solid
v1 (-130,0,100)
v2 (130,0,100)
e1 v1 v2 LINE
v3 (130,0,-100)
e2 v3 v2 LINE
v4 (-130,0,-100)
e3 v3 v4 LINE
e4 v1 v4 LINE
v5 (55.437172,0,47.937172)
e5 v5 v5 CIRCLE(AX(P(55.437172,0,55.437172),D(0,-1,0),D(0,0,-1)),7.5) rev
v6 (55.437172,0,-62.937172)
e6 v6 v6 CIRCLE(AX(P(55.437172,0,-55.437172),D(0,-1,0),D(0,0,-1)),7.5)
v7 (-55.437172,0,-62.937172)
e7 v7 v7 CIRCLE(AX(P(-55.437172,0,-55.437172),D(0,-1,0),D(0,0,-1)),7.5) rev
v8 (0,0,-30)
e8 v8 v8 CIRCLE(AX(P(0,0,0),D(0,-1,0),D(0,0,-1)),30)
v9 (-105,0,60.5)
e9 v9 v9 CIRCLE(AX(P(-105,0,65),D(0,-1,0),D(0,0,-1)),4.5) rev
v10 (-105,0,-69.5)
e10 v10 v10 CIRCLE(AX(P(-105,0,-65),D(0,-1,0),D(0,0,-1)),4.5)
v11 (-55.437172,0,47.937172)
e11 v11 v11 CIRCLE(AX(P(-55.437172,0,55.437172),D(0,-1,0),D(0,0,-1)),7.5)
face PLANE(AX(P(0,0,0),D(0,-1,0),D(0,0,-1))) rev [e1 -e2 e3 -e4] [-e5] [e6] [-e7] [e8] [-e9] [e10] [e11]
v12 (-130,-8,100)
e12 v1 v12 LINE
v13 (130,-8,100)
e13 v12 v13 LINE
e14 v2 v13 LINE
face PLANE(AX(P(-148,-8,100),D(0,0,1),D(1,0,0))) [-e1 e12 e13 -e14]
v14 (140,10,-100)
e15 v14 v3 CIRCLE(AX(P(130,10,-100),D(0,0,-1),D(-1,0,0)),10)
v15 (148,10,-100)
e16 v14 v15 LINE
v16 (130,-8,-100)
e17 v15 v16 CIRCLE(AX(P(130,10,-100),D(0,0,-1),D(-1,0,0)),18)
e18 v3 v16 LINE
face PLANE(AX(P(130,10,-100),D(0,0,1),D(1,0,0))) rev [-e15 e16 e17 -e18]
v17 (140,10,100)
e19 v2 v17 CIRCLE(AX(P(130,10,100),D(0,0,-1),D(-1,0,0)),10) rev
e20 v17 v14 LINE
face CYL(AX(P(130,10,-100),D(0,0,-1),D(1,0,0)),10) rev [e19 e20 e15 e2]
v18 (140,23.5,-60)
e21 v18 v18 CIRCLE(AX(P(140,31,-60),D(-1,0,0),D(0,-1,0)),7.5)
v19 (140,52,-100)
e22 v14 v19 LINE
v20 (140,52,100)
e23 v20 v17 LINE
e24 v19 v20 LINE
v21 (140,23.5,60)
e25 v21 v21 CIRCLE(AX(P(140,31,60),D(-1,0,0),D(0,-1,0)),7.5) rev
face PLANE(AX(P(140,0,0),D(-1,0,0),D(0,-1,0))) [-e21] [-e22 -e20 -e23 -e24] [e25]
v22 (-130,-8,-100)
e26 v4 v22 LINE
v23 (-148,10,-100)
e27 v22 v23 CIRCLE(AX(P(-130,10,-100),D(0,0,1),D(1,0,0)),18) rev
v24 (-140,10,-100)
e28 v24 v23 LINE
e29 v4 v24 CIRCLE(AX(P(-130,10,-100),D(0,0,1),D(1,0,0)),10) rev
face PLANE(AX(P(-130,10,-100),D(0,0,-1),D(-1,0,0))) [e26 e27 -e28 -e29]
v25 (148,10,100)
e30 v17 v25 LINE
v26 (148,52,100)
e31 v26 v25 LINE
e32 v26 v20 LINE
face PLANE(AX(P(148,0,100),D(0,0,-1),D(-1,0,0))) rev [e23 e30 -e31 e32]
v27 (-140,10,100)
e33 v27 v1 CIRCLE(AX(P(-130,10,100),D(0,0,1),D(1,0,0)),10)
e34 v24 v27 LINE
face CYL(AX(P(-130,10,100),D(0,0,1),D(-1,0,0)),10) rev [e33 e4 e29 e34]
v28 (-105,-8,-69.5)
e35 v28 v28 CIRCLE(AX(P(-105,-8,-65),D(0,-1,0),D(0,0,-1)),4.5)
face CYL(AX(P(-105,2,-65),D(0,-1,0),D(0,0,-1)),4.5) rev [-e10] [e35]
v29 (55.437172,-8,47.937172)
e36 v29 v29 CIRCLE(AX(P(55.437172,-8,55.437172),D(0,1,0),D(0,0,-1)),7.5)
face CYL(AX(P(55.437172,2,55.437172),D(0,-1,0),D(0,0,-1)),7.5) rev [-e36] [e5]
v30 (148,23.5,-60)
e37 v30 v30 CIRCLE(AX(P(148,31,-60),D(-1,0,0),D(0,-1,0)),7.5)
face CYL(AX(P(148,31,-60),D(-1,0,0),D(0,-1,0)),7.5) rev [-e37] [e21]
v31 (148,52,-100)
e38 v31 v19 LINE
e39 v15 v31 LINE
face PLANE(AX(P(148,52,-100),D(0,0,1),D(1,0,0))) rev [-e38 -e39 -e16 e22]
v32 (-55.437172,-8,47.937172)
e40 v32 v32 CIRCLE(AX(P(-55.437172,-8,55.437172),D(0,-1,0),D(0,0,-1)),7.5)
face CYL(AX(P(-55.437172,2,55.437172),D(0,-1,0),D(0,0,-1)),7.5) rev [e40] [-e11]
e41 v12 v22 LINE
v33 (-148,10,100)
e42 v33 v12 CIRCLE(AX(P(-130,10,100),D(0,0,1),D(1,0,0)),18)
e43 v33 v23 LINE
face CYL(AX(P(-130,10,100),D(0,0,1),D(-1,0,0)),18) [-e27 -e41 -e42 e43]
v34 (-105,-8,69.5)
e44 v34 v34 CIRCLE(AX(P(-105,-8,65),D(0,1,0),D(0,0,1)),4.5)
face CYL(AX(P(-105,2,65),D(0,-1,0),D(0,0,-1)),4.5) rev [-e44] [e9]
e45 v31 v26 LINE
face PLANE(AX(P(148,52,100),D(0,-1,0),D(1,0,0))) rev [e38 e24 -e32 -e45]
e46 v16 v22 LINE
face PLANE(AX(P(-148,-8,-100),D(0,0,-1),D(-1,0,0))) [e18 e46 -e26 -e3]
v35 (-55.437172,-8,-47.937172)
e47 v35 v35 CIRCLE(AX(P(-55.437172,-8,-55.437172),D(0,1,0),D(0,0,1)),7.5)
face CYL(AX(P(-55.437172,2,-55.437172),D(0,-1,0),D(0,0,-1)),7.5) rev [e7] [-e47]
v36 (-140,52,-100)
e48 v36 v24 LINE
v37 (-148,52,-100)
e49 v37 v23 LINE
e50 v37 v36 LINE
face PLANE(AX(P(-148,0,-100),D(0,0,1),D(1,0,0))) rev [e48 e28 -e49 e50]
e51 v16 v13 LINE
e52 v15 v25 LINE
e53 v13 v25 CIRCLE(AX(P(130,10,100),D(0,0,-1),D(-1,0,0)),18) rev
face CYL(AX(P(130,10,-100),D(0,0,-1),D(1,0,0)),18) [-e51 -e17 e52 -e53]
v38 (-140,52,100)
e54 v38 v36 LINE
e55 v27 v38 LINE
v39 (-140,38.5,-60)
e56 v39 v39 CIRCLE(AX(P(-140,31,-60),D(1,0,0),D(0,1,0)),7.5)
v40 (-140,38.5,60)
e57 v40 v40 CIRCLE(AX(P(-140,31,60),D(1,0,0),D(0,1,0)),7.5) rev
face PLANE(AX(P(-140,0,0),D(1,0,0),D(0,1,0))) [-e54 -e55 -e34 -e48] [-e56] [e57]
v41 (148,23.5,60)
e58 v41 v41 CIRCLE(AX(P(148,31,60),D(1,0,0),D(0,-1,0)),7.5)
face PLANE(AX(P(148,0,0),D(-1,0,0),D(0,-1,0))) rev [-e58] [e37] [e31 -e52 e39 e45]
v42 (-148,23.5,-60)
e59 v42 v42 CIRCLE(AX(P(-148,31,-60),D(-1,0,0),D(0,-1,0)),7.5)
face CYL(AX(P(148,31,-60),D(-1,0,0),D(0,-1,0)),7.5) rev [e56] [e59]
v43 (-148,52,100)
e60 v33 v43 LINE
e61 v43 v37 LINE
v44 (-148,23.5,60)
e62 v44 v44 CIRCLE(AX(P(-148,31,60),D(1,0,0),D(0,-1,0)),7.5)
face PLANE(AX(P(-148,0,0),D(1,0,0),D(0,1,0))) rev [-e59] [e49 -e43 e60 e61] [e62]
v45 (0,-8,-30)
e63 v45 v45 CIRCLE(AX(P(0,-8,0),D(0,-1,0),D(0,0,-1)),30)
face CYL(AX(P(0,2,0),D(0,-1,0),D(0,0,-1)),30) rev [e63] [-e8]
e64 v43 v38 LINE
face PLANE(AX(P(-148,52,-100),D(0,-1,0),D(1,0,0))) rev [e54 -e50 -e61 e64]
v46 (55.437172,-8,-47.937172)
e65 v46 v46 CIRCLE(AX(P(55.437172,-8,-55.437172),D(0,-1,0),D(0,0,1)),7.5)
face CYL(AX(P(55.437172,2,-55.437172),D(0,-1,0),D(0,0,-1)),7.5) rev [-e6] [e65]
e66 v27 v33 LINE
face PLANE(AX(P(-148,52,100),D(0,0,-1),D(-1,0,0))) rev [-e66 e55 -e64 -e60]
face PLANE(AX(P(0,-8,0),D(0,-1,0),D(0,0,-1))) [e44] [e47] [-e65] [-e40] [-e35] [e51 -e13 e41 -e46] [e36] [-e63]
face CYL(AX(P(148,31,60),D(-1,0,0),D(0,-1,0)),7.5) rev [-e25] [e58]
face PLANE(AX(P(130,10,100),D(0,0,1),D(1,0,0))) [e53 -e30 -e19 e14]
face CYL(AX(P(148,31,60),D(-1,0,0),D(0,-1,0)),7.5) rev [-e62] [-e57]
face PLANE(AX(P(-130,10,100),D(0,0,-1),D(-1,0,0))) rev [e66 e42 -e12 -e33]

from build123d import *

# Parameters (mm, degrees)
SKETCH1_W                      = 296
SKETCH1_H                      = 200
BASE_FLANGE1_DEPTH             = 8
EDGE_FLANGE1_STRIP_W           = 52
EDGE_FLANGE1_STRIP_H           = 8
EDGE_FLANGE1_STRIP_CUT_DEPTH   = 200
EDGE_FLANGE1_STRIP_2_W         = 52
EDGE_FLANGE1_STRIP_2_H         = 8
EDGE_FLANGE1_STRIP_CUT_2_DEPTH = 200
EDGE_FLANGE1_DEPTH             = 200
EDGE_FLANGE1_BEND_DEPTH        = 200
SKETCH12_R                     = 30
CUT_EXTRUDE1_DEPTH             = 10
SKETCH13_R                     = 7.5
CUT_EXTRUDE2_DEPTH             = 10
SKETCH15_R                     = 7.5
CUT_EXTRUDE3_DEPTH             = 317.733326317
SKETCH16_R                     = 4.5
CUT_EXTRUDE4_DEPTH             = 10
MIRROR5_COPY_1_SKETCH_R        = 7.5
MIRROR5_COPY_1_DEPTH           = 10


# Sheet-metal steps are written as plain solids
with BuildPart() as part:
    # Sketch1 → Base-Flange1 (new body)
    with BuildSketch(Plane(origin=(0, 0, 0), x_dir=(1, 0, 0), z_dir=(0, 1, 0))):
        Rectangle(SKETCH1_W, SKETCH1_H)
    extrude(amount=-BASE_FLANGE1_DEPTH)

    # Edge-Flange1 strip (across the edge) → Edge-Flange1 strip cut (cut)
    with BuildSketch(Plane(origin=(-148, 0, -100), x_dir=(1, 0, 0), z_dir=(0, 0, 1))):
        with Locations((-8, -4)):
            Rectangle(EDGE_FLANGE1_STRIP_W, EDGE_FLANGE1_STRIP_H)
    extrude(amount=EDGE_FLANGE1_STRIP_CUT_DEPTH, mode=Mode.SUBTRACT)

    # Edge-Flange1 strip 2 (across the edge) → Edge-Flange1 strip cut 2 (cut)
    with BuildSketch(Plane(origin=(148, 0, 100), x_dir=(-1, 0, 0), z_dir=(0, 0, -1))):
        with Locations((-8, -4)):
            Rectangle(EDGE_FLANGE1_STRIP_2_W, EDGE_FLANGE1_STRIP_2_H)
    extrude(amount=EDGE_FLANGE1_STRIP_CUT_2_DEPTH, mode=Mode.SUBTRACT)

    # Edge-Flange1 section (across the edge) → Edge-Flange1 (add)
    with BuildSketch(Plane(origin=(-148, 0, -100), x_dir=(1, 0, 0), z_dir=(0, 0, 1))):
        with BuildLine():
            Line((0, 10), (0, 52))
            Line((0, 52), (8, 52))
            Line((8, 52), (8, 10))
            ThreePointArc((8, 10), (10.928932188, 2.928932188), (18, 0))
            Line((18, 0), (18, -8))
            ThreePointArc((18, -8), (5.272077939, -2.727922061), (0, 10))
        make_face()
    extrude(amount=EDGE_FLANGE1_DEPTH)

    # Edge-Flange1 section 2 (across the edge) → Edge-Flange1 bend (add)
    with BuildSketch(Plane(origin=(148, 0, 100), x_dir=(-1, 0, 0), z_dir=(0, 0, -1))):
        with BuildLine():
            Line((0, 10), (0, 52))
            Line((0, 52), (8, 52))
            Line((8, 52), (8, 10))
            ThreePointArc((8, 10), (10.928932188, 2.928932188), (18, 0))
            Line((18, 0), (18, -8))
            ThreePointArc((18, -8), (5.272077939, -2.727922061), (0, 10))
        make_face()
    extrude(amount=EDGE_FLANGE1_BEND_DEPTH)

    # Sketch12 → Cut-Extrude1 (cut)
    with BuildSketch(Plane(origin=(0, -8, 0), x_dir=(-1, 0, 0), z_dir=(0, -1, 0))):
        with Locations(Location((0, 0, 0), (0, 0, 90))):
            Circle(SKETCH12_R)
    extrude(amount=-CUT_EXTRUDE1_DEPTH, mode=Mode.SUBTRACT)

    # Sketch13 → Cut-Extrude2 (cut)
    with BuildSketch(Plane(origin=(0, -8, 0), x_dir=(-1, 0, 0), z_dir=(0, -1, 0))):
        with Locations(Location((55.437171645, -55.437171645, 0), (0, 0, 90))):
            Circle(SKETCH13_R)
    cut_extrude2 = extrude(amount=-CUT_EXTRUDE2_DEPTH, mode=Mode.SUBTRACT)

    # Mirror4: Cut-Extrude2 across plane
    add(cut_extrude2.mirror(Plane(origin=(0, 0, 0), x_dir=(0, 0, 1), z_dir=(1, 0, 0))), mode=Mode.SUBTRACT)

    # Sketch15 → Cut-Extrude3 (cut, through all)
    with BuildSketch(Plane.ZY.offset(148)):
        with Locations(Location((-60, 31, 0), (0, 0, 270))):
            Circle(SKETCH15_R)
    cut_extrude3 = extrude(amount=-CUT_EXTRUDE3_DEPTH, mode=Mode.SUBTRACT)

    # Sketch16 → Cut-Extrude4 (cut)
    with BuildSketch(Plane(origin=(0, -8, 0), x_dir=(-1, 0, 0), z_dir=(0, -1, 0))):
        with Locations(Location((105, 65, 0), (0, 0, 90))):
            Circle(SKETCH16_R)
    cut_extrude4 = extrude(amount=-CUT_EXTRUDE4_DEPTH, mode=Mode.SUBTRACT)

    # Mirror5: Cut-Extrude2, Cut-Extrude3, Cut-Extrude4 across plane
    add(cut_extrude2.mirror(Plane.XY), mode=Mode.SUBTRACT)
    add(cut_extrude3.mirror(Plane.XY), mode=Mode.SUBTRACT)
    add(cut_extrude4.mirror(Plane.XY), mode=Mode.SUBTRACT)

    # Mirror5 copy 1 sketch → Mirror5 copy 1 (cut)
    with BuildSketch(Plane.XZ.offset(8)):
        with Locations(Location((55.437171645, -55.437171645, 0), (0, 0, 90))):
            Circle(MIRROR5_COPY_1_SKETCH_R)
    extrude(amount=-MIRROR5_COPY_1_DEPTH, mode=Mode.SUBTRACT)


solid = part.part
